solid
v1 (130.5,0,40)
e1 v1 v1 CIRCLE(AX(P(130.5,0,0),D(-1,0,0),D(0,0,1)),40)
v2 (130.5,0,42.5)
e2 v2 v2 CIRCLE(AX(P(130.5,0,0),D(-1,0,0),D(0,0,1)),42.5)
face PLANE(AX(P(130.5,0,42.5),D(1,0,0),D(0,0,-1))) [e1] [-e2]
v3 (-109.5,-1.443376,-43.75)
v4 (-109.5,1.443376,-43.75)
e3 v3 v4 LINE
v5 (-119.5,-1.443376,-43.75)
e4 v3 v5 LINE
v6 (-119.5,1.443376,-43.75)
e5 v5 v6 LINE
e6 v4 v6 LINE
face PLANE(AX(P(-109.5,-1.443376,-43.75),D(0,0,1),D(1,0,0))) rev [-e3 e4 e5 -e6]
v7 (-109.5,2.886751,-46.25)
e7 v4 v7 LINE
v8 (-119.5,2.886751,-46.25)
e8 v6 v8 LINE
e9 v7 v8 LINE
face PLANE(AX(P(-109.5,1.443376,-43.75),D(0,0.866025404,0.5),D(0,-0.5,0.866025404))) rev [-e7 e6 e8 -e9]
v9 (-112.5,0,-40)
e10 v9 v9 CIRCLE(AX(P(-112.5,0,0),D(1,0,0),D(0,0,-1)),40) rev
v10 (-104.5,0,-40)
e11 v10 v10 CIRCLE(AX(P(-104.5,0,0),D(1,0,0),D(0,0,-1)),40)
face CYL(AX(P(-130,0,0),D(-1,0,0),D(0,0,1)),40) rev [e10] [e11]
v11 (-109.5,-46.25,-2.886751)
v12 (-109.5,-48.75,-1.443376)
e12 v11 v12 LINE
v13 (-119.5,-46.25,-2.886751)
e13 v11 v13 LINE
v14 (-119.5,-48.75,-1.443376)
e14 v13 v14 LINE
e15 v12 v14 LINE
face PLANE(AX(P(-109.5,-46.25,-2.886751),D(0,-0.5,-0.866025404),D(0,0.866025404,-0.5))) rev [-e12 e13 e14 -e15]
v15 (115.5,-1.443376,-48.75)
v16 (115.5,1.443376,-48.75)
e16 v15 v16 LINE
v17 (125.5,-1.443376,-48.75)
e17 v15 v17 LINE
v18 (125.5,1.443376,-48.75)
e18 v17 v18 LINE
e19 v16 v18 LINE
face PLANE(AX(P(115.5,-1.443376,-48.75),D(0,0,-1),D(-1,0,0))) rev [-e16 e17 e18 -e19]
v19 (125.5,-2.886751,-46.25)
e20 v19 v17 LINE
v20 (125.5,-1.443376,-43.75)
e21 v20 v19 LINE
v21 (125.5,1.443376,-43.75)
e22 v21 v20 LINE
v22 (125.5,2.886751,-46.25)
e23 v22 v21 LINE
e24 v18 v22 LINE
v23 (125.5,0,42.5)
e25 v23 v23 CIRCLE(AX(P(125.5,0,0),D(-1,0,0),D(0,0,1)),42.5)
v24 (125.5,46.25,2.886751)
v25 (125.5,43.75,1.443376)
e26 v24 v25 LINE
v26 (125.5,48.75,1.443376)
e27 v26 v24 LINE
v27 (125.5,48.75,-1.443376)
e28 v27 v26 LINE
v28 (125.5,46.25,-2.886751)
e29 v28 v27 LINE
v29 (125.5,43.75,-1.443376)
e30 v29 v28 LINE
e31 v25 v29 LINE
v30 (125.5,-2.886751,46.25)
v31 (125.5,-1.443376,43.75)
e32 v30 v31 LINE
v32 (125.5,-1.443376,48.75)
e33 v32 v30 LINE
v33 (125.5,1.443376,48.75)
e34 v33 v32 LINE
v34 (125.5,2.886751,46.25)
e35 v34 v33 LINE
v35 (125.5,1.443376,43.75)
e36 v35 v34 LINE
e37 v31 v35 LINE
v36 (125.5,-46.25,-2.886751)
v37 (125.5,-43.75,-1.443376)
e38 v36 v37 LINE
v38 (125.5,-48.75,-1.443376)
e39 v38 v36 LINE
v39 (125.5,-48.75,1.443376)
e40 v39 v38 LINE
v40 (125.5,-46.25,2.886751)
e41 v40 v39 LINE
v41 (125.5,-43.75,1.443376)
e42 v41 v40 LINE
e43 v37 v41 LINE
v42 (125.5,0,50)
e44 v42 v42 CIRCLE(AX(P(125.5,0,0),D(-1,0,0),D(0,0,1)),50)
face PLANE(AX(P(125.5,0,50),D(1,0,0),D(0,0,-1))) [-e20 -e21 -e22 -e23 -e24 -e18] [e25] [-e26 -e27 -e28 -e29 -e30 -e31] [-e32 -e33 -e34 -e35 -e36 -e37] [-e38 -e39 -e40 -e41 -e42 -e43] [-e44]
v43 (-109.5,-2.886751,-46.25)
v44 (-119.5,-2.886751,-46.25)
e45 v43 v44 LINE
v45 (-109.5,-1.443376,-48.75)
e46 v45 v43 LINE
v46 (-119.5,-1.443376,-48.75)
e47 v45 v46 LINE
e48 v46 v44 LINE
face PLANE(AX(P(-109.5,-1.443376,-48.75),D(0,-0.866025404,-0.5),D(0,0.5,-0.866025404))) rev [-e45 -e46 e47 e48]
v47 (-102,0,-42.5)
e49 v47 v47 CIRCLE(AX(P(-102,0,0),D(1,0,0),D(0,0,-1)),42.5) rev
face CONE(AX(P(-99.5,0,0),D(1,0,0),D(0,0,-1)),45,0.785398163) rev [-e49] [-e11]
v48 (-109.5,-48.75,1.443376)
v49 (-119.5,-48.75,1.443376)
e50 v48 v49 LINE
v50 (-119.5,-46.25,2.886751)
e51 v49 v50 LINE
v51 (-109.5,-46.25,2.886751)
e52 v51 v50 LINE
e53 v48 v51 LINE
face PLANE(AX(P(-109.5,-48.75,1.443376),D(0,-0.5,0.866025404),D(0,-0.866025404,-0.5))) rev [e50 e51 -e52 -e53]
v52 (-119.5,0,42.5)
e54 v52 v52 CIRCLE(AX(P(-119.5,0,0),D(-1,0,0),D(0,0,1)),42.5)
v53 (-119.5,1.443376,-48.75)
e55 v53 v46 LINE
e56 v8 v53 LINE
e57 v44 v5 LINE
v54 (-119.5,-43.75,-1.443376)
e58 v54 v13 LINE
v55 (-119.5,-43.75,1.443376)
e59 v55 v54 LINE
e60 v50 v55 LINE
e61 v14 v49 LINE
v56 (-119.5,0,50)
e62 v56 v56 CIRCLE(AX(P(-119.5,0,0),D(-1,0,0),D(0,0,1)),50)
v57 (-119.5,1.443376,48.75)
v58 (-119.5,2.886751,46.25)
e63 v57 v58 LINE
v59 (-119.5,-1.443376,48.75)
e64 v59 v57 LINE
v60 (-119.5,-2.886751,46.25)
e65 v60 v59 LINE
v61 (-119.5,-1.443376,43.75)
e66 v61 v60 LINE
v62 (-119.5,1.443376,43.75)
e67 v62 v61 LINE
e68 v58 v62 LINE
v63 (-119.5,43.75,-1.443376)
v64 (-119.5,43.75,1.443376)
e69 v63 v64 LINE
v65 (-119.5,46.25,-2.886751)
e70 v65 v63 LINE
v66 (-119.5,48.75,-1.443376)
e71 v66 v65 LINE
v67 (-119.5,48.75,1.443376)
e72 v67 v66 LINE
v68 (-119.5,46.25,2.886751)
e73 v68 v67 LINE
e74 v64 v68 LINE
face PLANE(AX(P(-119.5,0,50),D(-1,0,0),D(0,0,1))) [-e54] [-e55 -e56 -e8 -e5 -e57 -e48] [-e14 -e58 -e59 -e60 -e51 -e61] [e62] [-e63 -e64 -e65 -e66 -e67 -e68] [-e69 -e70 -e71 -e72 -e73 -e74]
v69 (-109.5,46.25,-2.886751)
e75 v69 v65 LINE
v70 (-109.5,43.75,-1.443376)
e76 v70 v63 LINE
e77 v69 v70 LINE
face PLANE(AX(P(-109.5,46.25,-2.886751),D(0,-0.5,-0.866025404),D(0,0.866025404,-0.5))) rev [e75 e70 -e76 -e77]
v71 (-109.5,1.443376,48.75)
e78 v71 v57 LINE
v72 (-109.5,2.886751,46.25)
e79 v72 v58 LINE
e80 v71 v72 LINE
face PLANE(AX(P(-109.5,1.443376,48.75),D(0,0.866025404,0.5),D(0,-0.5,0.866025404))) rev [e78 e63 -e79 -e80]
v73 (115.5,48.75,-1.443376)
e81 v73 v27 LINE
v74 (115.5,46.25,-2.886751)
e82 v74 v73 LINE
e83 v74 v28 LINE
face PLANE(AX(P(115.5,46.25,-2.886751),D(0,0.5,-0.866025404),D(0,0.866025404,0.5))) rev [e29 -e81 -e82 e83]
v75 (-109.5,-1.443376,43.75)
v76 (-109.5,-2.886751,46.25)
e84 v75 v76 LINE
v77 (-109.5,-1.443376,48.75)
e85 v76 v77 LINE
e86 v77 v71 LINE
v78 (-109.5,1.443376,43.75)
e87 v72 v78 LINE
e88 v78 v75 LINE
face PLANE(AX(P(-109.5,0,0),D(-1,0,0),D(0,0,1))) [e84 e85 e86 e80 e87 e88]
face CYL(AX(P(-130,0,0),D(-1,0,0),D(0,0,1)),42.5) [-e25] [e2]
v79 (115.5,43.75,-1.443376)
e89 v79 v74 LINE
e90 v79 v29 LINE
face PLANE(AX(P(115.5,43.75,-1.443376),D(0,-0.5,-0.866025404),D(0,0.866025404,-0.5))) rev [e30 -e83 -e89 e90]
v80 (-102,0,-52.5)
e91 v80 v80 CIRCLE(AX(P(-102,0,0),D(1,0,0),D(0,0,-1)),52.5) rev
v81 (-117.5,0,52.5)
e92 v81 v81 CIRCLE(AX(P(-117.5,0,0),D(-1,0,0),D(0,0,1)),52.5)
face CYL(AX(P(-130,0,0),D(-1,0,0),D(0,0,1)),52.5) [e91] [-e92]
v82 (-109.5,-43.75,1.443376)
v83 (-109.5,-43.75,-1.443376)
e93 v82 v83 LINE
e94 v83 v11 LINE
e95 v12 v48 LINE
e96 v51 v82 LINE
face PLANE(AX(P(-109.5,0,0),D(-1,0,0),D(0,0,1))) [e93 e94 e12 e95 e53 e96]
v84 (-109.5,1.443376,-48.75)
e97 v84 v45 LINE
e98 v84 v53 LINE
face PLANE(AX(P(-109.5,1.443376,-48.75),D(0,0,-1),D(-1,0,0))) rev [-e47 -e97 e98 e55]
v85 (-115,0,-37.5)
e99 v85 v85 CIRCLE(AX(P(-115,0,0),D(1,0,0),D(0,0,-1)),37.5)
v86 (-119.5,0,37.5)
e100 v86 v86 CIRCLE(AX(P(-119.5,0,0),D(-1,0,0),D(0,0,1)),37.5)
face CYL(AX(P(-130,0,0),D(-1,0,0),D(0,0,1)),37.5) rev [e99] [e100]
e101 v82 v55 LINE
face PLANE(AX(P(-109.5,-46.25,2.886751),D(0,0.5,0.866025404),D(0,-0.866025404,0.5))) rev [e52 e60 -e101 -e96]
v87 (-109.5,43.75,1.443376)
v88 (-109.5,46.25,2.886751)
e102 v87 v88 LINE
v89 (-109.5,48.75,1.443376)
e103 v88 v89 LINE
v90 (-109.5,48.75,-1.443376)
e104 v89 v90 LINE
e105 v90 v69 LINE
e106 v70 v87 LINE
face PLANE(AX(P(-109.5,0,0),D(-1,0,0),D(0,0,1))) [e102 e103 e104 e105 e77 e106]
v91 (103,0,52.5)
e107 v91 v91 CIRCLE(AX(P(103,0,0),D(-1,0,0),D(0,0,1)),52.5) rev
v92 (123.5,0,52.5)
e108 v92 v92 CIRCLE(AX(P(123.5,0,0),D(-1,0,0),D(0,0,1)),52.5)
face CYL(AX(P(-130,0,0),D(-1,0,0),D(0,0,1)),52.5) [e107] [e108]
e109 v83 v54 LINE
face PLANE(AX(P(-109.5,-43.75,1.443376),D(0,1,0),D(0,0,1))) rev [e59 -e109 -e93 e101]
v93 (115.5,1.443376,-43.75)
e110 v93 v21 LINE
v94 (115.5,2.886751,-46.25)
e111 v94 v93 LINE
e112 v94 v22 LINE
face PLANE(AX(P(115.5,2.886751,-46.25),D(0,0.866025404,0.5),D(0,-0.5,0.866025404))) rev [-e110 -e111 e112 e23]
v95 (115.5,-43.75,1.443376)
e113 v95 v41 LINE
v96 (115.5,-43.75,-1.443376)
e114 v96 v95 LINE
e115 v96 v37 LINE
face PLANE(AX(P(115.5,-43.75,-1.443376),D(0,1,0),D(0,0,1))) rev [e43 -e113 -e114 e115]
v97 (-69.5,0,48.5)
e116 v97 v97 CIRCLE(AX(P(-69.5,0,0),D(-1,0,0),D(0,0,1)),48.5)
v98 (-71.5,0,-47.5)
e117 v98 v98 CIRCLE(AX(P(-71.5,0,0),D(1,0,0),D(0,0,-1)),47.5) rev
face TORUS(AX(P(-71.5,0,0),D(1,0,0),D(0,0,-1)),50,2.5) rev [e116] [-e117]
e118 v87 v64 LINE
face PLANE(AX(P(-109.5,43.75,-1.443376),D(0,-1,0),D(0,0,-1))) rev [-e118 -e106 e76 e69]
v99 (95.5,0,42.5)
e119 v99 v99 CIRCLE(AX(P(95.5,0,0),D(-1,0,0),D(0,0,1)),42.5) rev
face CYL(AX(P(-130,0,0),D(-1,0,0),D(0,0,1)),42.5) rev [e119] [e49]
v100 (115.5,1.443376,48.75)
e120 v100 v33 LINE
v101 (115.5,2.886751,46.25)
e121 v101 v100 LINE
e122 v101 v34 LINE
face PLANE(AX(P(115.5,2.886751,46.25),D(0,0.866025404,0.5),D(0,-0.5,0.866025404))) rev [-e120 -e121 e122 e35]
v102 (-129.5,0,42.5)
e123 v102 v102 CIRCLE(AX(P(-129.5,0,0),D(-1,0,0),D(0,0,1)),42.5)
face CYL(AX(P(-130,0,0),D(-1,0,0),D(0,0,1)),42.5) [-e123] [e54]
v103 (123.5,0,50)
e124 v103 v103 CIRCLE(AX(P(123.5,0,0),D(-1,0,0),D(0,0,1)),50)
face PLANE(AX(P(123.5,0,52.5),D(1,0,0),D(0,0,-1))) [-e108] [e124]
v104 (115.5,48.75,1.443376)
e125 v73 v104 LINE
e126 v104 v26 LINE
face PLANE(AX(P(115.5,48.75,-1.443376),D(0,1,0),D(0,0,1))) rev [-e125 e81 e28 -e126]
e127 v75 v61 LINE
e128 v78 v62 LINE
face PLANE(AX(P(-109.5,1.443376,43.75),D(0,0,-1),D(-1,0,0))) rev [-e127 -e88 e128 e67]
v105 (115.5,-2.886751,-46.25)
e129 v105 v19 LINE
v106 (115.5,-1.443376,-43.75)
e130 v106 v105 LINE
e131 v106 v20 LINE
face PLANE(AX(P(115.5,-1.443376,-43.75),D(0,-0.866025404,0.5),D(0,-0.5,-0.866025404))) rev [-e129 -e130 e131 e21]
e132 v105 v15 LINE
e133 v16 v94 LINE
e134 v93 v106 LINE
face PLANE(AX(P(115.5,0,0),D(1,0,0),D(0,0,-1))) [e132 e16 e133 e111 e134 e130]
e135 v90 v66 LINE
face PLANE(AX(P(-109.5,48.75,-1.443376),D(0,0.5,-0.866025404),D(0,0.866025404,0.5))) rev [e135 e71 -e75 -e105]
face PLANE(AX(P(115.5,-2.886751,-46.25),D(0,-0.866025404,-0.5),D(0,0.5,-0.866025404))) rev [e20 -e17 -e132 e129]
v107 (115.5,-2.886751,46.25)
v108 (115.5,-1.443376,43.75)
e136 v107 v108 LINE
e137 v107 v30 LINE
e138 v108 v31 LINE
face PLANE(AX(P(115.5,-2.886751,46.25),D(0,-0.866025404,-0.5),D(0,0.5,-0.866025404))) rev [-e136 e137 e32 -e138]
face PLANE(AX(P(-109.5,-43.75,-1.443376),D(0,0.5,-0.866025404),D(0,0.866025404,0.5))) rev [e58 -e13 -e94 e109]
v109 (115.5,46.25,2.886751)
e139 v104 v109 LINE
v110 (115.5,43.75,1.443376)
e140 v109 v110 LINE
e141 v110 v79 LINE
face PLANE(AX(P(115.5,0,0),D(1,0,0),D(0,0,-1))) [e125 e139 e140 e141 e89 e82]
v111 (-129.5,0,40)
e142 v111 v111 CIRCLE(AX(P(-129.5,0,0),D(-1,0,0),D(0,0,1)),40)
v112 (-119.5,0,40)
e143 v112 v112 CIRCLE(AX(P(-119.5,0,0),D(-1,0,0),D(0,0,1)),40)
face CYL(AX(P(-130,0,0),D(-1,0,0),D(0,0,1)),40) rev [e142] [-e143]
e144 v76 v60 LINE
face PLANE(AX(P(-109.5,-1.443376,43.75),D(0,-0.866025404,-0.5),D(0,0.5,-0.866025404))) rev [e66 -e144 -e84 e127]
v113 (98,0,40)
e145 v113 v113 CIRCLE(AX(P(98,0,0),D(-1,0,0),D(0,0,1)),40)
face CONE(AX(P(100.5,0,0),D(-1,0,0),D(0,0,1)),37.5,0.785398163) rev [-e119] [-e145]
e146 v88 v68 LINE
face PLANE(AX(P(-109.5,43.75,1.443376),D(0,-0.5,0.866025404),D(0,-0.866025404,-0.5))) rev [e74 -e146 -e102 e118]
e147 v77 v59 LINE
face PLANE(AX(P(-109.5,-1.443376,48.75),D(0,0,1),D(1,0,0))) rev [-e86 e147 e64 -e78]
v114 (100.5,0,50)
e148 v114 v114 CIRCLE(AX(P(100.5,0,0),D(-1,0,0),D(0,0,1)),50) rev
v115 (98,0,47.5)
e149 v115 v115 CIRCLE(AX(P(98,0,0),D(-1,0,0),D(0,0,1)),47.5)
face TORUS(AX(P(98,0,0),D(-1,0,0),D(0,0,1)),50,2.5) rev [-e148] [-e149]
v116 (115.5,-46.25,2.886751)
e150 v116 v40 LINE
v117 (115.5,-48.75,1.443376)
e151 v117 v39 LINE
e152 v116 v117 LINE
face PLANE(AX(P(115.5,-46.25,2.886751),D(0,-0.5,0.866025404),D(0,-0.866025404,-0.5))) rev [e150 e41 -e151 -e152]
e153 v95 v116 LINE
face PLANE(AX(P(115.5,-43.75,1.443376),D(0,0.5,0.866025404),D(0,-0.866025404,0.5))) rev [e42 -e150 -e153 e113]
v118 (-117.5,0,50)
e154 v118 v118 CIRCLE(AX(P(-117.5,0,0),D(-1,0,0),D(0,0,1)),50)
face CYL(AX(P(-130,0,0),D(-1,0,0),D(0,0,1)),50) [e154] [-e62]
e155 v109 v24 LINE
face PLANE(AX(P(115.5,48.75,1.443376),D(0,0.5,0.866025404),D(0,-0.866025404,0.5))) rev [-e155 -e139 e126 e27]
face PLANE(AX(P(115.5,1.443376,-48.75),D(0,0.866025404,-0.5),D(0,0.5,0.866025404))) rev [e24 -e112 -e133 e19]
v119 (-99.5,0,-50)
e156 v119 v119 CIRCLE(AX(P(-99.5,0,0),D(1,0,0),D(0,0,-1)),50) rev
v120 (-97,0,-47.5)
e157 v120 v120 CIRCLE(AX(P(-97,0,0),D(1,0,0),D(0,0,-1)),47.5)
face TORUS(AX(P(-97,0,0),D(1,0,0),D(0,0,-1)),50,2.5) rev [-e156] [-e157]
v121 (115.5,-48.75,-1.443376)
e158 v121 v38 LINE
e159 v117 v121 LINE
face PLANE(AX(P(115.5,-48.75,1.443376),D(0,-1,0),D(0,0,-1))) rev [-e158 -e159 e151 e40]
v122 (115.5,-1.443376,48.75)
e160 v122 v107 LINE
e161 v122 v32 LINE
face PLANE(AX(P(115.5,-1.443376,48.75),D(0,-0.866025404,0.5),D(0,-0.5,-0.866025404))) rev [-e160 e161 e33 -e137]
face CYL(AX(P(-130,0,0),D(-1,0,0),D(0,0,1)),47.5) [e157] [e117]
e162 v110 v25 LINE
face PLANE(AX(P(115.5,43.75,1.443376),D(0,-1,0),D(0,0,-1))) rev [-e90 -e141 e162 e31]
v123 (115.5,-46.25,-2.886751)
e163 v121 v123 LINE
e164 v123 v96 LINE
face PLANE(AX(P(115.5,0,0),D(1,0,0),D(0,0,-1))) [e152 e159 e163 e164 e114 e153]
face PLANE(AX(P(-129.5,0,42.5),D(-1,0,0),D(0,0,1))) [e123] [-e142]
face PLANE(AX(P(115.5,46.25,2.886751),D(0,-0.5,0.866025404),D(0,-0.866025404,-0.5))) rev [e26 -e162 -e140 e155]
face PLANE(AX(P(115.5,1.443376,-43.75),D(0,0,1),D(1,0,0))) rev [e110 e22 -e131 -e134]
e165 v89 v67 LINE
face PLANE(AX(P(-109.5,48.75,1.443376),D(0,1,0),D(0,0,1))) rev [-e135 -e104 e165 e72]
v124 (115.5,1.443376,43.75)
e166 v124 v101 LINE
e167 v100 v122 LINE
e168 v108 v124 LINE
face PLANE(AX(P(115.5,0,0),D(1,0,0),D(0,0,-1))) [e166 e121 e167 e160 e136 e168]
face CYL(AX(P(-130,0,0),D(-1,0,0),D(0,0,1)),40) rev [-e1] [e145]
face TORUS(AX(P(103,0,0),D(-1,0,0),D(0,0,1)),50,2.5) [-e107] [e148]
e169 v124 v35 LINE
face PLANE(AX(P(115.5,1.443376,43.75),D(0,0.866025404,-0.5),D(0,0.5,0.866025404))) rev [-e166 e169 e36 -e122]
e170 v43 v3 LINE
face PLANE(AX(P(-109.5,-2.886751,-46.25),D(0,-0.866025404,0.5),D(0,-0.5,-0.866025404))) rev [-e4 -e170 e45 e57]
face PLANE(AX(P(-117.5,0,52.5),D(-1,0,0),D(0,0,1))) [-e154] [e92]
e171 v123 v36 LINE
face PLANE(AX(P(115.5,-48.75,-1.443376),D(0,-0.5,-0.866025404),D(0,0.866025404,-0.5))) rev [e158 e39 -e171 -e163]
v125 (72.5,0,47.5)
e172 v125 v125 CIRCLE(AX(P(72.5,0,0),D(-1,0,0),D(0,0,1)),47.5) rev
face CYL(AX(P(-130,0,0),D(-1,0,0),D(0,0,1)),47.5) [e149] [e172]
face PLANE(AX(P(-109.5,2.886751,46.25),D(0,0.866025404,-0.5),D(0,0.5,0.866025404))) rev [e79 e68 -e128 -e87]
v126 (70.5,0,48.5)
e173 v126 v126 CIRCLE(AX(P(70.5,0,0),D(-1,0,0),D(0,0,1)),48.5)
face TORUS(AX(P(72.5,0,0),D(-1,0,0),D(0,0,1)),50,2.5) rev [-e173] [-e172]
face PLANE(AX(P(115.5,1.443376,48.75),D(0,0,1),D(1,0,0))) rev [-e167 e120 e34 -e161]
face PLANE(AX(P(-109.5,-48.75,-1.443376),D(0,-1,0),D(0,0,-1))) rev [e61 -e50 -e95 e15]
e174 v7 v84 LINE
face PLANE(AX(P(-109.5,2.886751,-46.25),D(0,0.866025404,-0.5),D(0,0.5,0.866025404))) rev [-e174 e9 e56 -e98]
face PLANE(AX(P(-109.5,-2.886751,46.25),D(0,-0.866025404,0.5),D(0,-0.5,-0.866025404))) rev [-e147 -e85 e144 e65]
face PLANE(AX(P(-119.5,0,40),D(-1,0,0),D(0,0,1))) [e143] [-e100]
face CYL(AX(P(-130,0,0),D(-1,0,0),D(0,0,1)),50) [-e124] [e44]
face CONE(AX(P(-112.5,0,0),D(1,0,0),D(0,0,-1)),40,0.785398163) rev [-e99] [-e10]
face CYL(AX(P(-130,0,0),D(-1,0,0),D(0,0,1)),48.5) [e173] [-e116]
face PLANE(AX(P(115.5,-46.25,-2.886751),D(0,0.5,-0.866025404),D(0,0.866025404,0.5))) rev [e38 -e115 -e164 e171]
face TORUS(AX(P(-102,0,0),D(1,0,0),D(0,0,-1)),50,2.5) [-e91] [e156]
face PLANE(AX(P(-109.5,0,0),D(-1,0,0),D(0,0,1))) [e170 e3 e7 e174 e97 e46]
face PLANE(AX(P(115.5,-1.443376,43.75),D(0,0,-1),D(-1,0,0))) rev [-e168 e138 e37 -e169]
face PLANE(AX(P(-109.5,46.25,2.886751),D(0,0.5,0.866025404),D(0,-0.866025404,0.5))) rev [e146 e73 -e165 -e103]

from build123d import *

# Parameters (mm, degrees)
CHAMFER5_SIZE      = 5
FILLET1_R          = 2.5
FILLET2_R          = 2.5
CUT_EXTRUDE1_DEPTH = 10
CUT_EXTRUDE2_DEPTH = 10


# Some blends are built 0.0001 mm under size
with BuildPart() as part:
    # Sketch2 → Revolve1 (revolve)
    with BuildSketch(Plane(origin=(0, 0, 0), x_dir=(1, 0, 0), z_dir=(0, 1, 0))):
        Polygon((100.5, -42.5), (-99.5, -42.5), (-99.5, -40), (-117.5, -40), (-117.5, -37.5), (-119.5, -37.5), (-119.5, -40), (-129.5, -40), (-129.5, -42.5), (-119.5, -42.5), (-119.5, -50), (-117.5, -50), (-117.5, -52.5), (-99.5, -52.5), (-99.5, -47.5), (-69.5, -47.5), (-69.5, -48.5), (70.5, -48.5), (70.5, -47.5), (100.5, -47.5), (100.5, -52.5), (123.5, -52.5), (123.5, -50), (125.5, -50), (125.5, -42.5), (130.5, -42.5), (130.5, -40), (100.5, -40), align=None)
    revolve(axis=Axis((-130, 0, 0), (1, 0, 0)))

    # Chamfer5
    # the kernel refuses this chamfer: 5 mm, written as the material it adds along each edge
    with BuildSketch(Plane(origin=(-117.5, 0, 0), x_dir=(0, 0, 1), z_dir=(0, 1, 0))) as chamfer5_piece_1_section:
        Polygon((40, CHAMFER5_SIZE), (40 - CHAMFER5_SIZE, 0), (40, 0), align=None)
    chamfer5_piece_1 = revolve(axis=Axis((-117.5, 0, 0), (1, 0, 0)), mode=Mode.PRIVATE)
    chamfer5_piece_1 = chamfer5_piece_1 - Plane(origin=(-113.775296331, 0, 0), x_dir=(0, 0, 1), z_dir=(-1, 0, 0)) * Cylinder(37.5, 161, mode=Mode.PRIVATE)
    add(chamfer5_piece_1)
    with BuildSketch(Plane(origin=(100.5, 0, 0), x_dir=(0, 0, 1), z_dir=(0, 1, 0))) as chamfer5_piece_2_section:
        Polygon((42.5, -CHAMFER5_SIZE), (42.5 - CHAMFER5_SIZE, 0), (42.5, 0), align=None)
    chamfer5_piece_2 = revolve(axis=Axis((100.5, 0, 0), (1, 0, 0)), mode=Mode.PRIVATE)
    chamfer5_piece_2 = chamfer5_piece_2 - Plane(origin=(96.777307506, 0, 0), x_dir=(0, 0, 1), z_dir=(-1, 0, 0)) * Cylinder(40, 170, mode=Mode.PRIVATE)
    add(chamfer5_piece_2)
    # the kernel refuses this chamfer: 5 mm, written as the material it takes off along each edge
    with BuildSketch(Plane(origin=(-99.5, 0, 0), x_dir=(0, 0, 1), z_dir=(0, 1, 0))) as chamfer5_2_piece_1_section:
        Polygon((40 + CHAMFER5_SIZE, 0), (40, -CHAMFER5_SIZE), (40, 0), align=None)
    chamfer5_2_piece_1 = revolve(axis=Axis((-99.5, 0, 0), (1, 0, 0)), mode=Mode.PRIVATE)
    chamfer5_2_piece_1 = chamfer5_2_piece_1 & Plane(origin=(-103.223022752, 0, 0), x_dir=(0, 0, 1), z_dir=(-1, 0, 0)) * Cylinder(42.5, 181, mode=Mode.PRIVATE)
    add(chamfer5_2_piece_1, mode=Mode.SUBTRACT)

    # Fillet1
    # the kernel refuses this fillet: 2.5 mm, written as the material it adds along each edge
    with BuildSketch(Plane(origin=(-99.5, 0, 0), x_dir=(0, 0, 1), z_dir=(0, 1, 0))) as fillet1_piece_1:
        with BuildLine():
            CenterArc((47.5 + FILLET1_R, FILLET1_R), FILLET1_R, 180, 90)
            Line((47.5 + FILLET1_R, 0), (47.5 + FILLET1_R, -FILLET1_R * 0.02))
            Line((47.5 + FILLET1_R, -FILLET1_R * 0.02), (47.5 - FILLET1_R * 0.02, -FILLET1_R * 0.02))
            Line((47.5 - FILLET1_R * 0.02, -FILLET1_R * 0.02), (47.5 - FILLET1_R * 0.02, FILLET1_R))
            Line((47.5 - FILLET1_R * 0.02, FILLET1_R), (47.5, FILLET1_R))
        make_face()
    revolve(axis=Axis((-99.5, 0, 0), (1, 0, 0)))
    with BuildSketch(Plane(origin=(-69.5, 0, 0), x_dir=(0, 0, 1), z_dir=(0, 1, 0))) as fillet1_piece_2:
        with BuildLine():
            CenterArc((50, -2), FILLET1_R, 126.869897646, 53.130102354)
            Line((47.5, -2), (47.45, -2))
            Line((47.45, -2), (47.45, 0))
            Line((47.45, 0), (47.5, 0.05))
            ThreePointArc((47.5, 0.05), (48, 0.05), (48.47, 0.04))
            Line((48.47, 0.04), (48.5, 0))
        make_face()
    revolve(axis=Axis((-69.5, 0, 0), (1, 0, 0)))
    with BuildSketch(Plane(origin=(70.5, 0, 0), x_dir=(0, 0, 1), z_dir=(0, 1, 0))) as fillet1_piece_3:
        with BuildLine():
            CenterArc((50, 2), FILLET1_R, 180, 53.130102354)
            Line((48.5, 0), (48.47, -0.04))
            ThreePointArc((48.47, -0.04), (48, -0.05), (47.5, -0.05))
            Line((47.5, -0.05), (47.45, 0))
            Line((47.45, 0), (47.45, 2))
            Line((47.45, 2), (47.5, 2))
        make_face()
    revolve(axis=Axis((70.5, 0, 0), (1, 0, 0)))
    with BuildSketch(Plane(origin=(100.5, 0, 0), x_dir=(0, 0, 1), z_dir=(0, 1, 0))) as fillet1_piece_4:
        with BuildLine():
            CenterArc((47.5 + FILLET1_R, -FILLET1_R), FILLET1_R, 90, 90)
            Line((47.5, -FILLET1_R), (47.5 - FILLET1_R * 0.02, -FILLET1_R))
            Line((47.5 - FILLET1_R * 0.02, -FILLET1_R), (47.5 - FILLET1_R * 0.02, FILLET1_R * 0.02))
            Line((47.5 - FILLET1_R * 0.02, FILLET1_R * 0.02), (47.5 + FILLET1_R, FILLET1_R * 0.02))
            Line((47.5 + FILLET1_R, FILLET1_R * 0.02), (47.5 + FILLET1_R, 0))
        make_face()
    revolve(axis=Axis((100.5, 0, 0), (1, 0, 0)))

    # Fillet2
    fillet2_edges = [part.edges().sort_by_distance(p)[0] for p in [
        (-99.5, 0, -52.5),
        (100.5, 0, -52.5),
    ]]
    fillet(fillet2_edges, radius=FILLET2_R - 0.0001)  # a hair under: the kernel refuses the full size

    # Sketch3 → Cut-Extrude1 (cut)
    with BuildSketch(Plane.ZY.offset(119.5)):
        Polygon((2.886751346, 46.25), (1.443375673, 48.75), (-1.443375673, 48.75), (-2.886751346, 46.25), (-1.443375673, 43.75), (1.443375673, 43.75), align=None)
        Polygon((46.25, -2.886751346), (48.75, -1.443375673), (48.75, 1.443375673), (46.25, 2.886751346), (43.75, 1.443375673), (43.75, -1.443375673), align=None)
        Polygon((-46.25, -2.886751346), (-43.75, -1.443375673), (-43.75, 1.443375673), (-46.25, 2.886751346), (-48.75, 1.443375673), (-48.75, -1.443375673), align=None)
        Polygon((2.886751346, -46.25), (1.443375673, -43.75), (-1.443375673, -43.75), (-2.886751346, -46.25), (-1.443375673, -48.75), (1.443375673, -48.75), align=None)
    extrude(amount=-CUT_EXTRUDE1_DEPTH, mode=Mode.SUBTRACT)

    # Sketch5 → Cut-Extrude2 (cut)
    with BuildSketch(Plane(origin=(125.5, 0, 0), x_dir=(0, 0, -1), z_dir=(1, 0, 0))):
        Polygon((2.886751346, 46.25), (1.443375673, 48.75), (-1.443375673, 48.75), (-2.886751346, 46.25), (-1.443375673, 43.75), (1.443375673, 43.75), align=None)
        Polygon((46.25, -2.886751346), (48.75, -1.443375673), (48.75, 1.443375673), (46.25, 2.886751346), (43.75, 1.443375673), (43.75, -1.443375673), align=None)
        Polygon((2.886751346, -46.25), (1.443375673, -43.75), (-1.443375673, -43.75), (-2.886751346, -46.25), (-1.443375673, -48.75), (1.443375673, -48.75), align=None)
        Polygon((-46.25, -2.886751346), (-43.75, -1.443375673), (-43.75, 1.443375673), (-46.25, 2.886751346), (-48.75, 1.443375673), (-48.75, -1.443375673), align=None)
    extrude(amount=-CUT_EXTRUDE2_DEPTH, mode=Mode.SUBTRACT)


solid = part.part
